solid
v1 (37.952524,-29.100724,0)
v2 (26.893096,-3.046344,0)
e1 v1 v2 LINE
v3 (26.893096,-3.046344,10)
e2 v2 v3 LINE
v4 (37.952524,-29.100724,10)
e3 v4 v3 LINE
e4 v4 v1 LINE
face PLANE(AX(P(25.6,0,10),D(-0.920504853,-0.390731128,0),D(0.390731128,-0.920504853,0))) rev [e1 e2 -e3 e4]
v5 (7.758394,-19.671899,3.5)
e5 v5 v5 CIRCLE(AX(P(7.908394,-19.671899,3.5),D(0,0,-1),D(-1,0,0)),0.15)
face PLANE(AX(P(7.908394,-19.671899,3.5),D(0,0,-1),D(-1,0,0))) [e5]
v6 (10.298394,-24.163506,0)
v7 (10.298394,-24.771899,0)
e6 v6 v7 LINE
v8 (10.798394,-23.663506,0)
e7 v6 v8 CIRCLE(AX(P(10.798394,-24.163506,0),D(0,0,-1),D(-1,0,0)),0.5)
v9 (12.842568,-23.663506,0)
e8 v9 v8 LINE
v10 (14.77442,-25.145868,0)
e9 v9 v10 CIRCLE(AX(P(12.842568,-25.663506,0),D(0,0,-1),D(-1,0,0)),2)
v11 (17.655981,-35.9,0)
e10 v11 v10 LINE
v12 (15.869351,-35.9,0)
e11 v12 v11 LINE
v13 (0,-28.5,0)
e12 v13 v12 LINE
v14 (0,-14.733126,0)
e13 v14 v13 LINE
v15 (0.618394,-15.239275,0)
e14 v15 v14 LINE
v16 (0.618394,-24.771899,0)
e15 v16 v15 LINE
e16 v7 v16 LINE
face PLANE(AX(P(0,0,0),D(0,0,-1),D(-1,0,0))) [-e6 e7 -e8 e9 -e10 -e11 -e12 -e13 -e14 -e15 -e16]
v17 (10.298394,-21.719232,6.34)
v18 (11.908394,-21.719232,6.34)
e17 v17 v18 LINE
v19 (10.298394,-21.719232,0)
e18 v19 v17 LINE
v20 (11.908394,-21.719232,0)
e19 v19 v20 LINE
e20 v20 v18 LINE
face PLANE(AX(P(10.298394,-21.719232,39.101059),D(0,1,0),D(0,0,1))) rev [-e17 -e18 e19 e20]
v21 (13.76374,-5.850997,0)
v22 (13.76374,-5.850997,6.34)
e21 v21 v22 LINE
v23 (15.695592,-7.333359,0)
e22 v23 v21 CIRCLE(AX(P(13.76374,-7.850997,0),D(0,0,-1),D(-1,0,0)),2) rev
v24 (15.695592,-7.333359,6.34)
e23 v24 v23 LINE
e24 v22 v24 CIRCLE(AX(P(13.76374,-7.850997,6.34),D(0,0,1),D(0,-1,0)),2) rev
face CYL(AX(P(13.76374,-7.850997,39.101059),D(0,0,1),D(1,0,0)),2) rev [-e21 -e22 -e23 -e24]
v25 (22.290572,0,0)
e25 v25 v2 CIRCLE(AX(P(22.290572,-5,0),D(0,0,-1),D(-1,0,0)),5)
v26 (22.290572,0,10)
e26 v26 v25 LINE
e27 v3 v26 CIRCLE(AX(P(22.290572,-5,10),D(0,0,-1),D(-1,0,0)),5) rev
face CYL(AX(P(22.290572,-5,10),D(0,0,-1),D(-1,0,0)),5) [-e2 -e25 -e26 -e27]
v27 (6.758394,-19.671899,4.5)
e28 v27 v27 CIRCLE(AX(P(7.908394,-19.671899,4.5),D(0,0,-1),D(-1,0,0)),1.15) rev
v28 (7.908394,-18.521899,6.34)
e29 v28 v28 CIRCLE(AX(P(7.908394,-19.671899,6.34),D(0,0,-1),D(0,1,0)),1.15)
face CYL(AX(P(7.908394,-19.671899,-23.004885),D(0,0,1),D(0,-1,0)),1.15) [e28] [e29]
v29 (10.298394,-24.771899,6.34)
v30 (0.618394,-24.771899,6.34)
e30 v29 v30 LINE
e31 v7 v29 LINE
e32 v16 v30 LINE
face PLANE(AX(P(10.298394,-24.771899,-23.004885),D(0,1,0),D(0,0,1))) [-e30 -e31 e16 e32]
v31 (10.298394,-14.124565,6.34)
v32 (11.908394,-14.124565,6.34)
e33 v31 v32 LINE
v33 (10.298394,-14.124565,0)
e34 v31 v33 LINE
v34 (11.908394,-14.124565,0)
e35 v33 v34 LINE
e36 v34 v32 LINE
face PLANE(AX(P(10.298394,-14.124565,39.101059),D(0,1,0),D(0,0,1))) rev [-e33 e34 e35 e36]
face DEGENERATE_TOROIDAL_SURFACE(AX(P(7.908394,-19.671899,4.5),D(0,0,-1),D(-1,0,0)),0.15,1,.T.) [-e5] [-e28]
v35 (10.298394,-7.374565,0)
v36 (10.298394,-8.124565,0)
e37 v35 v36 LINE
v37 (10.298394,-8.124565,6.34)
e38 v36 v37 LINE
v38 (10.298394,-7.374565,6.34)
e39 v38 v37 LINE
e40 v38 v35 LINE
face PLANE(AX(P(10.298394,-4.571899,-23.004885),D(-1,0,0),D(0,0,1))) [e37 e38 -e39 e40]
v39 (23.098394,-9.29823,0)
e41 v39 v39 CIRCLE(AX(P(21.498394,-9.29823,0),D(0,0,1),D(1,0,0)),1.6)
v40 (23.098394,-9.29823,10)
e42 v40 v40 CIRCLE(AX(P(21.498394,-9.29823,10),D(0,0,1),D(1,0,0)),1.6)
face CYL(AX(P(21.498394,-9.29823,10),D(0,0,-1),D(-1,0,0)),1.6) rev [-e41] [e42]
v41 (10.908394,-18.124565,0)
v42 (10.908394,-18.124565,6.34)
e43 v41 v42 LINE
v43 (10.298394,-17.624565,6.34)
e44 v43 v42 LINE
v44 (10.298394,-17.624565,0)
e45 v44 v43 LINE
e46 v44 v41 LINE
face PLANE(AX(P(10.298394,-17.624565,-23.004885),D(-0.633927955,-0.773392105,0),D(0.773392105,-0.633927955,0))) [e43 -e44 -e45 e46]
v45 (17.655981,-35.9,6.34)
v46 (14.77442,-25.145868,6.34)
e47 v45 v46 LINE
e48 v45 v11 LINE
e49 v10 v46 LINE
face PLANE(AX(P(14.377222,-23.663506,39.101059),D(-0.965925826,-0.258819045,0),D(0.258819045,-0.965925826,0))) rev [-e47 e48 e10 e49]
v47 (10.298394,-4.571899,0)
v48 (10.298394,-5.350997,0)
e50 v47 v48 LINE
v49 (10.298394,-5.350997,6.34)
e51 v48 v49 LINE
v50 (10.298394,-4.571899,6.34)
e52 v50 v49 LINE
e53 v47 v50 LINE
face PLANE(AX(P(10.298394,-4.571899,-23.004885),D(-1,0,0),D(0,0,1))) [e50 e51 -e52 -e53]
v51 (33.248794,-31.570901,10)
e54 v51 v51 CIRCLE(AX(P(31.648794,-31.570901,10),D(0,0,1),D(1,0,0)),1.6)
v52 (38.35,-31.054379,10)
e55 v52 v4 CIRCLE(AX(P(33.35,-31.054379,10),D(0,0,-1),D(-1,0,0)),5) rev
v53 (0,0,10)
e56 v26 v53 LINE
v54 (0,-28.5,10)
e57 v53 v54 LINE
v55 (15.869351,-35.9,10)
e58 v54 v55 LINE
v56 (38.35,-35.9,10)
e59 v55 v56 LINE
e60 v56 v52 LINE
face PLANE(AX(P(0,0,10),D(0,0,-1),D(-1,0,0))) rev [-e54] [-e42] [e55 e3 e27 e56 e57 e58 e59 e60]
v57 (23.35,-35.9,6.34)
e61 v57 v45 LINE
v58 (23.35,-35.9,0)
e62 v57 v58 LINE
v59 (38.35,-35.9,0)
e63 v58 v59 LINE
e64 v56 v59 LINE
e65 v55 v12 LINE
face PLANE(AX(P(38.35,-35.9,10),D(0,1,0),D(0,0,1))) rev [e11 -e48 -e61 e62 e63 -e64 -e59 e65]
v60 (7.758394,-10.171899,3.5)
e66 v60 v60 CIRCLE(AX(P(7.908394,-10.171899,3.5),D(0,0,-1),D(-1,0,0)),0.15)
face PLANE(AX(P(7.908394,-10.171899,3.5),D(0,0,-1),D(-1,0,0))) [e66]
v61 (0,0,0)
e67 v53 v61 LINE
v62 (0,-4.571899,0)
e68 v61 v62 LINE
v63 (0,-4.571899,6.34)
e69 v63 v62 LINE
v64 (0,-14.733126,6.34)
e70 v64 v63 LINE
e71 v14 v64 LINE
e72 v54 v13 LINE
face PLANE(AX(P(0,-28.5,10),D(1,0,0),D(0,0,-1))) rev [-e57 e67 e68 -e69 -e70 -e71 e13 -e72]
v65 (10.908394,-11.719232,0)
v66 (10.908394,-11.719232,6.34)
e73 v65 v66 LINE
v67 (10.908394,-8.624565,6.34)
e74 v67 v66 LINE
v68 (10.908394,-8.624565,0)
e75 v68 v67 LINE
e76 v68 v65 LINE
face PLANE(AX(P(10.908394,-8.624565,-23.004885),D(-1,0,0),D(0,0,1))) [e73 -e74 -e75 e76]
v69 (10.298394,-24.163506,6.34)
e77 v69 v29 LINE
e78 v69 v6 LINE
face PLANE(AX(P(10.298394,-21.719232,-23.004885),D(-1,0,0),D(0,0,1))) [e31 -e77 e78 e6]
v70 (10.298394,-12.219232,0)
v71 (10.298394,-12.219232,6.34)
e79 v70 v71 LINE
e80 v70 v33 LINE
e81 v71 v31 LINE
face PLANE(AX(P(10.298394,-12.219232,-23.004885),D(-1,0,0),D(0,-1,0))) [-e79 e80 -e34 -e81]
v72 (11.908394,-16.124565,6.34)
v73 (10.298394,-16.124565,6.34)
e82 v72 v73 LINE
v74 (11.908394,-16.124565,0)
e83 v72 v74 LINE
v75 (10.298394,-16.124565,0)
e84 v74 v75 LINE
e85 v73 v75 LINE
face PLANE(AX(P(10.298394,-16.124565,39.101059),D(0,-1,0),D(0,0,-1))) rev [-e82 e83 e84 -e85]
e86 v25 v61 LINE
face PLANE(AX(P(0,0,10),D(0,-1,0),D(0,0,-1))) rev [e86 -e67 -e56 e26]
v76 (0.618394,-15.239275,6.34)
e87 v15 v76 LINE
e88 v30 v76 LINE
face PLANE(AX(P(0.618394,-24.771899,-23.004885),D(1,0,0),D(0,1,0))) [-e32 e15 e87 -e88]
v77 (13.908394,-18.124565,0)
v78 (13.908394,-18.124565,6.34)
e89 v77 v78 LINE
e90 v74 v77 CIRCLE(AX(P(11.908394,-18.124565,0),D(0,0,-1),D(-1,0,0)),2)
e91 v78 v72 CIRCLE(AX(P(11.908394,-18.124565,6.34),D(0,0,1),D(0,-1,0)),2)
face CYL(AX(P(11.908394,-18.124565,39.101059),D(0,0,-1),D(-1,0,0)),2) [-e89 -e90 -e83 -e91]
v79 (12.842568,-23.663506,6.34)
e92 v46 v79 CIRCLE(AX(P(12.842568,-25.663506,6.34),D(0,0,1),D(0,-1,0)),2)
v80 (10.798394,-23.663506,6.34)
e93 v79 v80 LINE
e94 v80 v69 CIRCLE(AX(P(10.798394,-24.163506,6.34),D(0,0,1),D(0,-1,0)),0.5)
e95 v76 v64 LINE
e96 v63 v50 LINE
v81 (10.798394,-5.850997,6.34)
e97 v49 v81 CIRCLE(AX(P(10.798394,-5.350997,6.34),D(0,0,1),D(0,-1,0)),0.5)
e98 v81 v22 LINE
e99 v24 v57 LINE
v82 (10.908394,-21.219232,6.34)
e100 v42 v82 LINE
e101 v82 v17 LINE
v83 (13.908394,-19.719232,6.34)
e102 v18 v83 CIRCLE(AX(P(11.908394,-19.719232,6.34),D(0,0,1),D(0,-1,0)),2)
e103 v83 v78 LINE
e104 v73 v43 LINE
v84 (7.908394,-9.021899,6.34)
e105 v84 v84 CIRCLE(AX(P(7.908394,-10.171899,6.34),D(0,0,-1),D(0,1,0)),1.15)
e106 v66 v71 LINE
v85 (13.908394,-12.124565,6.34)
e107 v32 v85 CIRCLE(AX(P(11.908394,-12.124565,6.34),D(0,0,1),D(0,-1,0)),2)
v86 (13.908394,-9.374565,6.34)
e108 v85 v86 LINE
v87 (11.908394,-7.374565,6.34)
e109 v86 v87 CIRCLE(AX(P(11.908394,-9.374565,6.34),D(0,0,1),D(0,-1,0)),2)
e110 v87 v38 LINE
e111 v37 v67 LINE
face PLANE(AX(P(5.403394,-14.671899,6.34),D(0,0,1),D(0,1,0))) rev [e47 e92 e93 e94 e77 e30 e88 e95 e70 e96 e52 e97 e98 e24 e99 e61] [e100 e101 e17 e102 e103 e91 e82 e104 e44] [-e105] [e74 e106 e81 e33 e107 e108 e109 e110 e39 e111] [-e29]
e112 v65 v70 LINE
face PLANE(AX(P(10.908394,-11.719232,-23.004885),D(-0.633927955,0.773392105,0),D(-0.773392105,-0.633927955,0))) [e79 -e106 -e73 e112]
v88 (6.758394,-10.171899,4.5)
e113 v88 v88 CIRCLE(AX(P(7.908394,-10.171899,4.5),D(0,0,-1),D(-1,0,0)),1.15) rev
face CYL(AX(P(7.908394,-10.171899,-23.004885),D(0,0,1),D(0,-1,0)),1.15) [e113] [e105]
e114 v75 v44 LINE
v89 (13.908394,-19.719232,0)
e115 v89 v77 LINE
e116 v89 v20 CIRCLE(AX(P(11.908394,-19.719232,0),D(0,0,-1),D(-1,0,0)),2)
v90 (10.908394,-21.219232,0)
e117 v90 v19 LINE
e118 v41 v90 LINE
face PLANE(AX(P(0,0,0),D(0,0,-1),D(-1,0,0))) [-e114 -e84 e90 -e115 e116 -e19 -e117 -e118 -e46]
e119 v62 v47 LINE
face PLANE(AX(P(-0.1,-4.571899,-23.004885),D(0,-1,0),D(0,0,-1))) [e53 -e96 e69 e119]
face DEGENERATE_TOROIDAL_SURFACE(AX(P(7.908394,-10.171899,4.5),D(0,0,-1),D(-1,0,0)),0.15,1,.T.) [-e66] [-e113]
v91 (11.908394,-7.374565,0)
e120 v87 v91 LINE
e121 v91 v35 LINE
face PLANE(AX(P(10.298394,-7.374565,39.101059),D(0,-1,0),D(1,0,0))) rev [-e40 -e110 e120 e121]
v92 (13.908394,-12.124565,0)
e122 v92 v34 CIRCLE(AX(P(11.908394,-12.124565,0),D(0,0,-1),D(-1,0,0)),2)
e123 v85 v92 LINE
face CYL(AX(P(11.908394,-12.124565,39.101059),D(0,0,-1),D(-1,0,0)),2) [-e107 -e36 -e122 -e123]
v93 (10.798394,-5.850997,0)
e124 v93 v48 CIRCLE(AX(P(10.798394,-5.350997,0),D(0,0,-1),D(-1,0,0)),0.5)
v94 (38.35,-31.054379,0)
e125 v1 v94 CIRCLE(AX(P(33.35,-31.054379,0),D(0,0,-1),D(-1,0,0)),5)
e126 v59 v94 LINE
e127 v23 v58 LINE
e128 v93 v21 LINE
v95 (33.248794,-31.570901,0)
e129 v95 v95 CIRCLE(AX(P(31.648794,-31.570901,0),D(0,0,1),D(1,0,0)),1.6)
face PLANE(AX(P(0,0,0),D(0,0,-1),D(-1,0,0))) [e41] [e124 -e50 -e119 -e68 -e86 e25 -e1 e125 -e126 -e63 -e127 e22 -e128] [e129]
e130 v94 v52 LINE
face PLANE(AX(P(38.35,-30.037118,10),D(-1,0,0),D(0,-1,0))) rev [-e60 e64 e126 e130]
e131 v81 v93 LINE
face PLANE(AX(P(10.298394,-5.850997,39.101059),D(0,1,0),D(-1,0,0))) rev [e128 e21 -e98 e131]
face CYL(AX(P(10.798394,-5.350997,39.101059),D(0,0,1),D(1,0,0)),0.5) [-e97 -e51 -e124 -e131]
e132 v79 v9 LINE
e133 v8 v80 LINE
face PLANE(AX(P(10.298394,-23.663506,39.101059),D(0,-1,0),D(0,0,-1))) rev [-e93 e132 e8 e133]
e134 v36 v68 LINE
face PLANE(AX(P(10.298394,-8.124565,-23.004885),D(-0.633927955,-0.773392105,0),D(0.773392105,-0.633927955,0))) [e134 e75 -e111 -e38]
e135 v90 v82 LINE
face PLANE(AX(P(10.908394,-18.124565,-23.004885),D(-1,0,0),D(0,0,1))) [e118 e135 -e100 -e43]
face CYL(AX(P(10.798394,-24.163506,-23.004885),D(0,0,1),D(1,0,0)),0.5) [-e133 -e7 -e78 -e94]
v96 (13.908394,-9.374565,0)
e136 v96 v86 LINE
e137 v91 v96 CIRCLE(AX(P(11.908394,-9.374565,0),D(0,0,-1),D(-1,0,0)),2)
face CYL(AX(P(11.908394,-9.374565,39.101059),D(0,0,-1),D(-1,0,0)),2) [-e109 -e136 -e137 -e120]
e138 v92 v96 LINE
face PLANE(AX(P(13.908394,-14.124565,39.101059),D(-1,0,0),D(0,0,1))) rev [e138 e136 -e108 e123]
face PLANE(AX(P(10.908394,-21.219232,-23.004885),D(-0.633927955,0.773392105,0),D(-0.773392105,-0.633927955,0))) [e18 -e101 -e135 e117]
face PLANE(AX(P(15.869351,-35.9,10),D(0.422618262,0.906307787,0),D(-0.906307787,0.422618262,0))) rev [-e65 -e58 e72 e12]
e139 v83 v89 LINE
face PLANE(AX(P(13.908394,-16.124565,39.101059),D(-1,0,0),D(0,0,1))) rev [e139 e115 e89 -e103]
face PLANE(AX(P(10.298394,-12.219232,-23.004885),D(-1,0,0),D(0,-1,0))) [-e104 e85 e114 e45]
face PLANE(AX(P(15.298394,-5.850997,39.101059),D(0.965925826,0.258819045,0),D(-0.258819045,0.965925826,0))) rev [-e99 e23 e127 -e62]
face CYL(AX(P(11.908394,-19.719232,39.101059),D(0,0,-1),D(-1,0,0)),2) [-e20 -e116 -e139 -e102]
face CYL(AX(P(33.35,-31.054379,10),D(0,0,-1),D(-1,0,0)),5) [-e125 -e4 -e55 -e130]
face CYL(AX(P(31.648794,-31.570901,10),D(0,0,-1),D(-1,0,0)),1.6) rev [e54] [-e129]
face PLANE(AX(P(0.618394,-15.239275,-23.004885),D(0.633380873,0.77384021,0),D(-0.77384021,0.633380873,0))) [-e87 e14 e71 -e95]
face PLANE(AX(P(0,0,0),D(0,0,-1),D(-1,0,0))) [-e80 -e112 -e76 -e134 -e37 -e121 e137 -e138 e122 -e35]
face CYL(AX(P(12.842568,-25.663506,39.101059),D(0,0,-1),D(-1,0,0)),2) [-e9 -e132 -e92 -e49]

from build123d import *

# Parameters (mm, degrees)
SKETCH1_R           = 1.6
BOSS_EXTRUDE1_DEPTH = 10
CAVITY1_OUTLINE_R   = 1.25
CAVITY1_DEPTH       = 6.34
CAVITY1_START       = -22.606898648
CAVITY1_2_OUTLINE_R = 0.9
CAVITY1_2_DEPTH     = 0.47
CAVITY1_START_2     = -15.306898648
CAVITY1_3_OUTLINE_R = 0.9
CAVITY1_3_DEPTH     = 0.47
CAVITY1_START_3     = -6.506898648
CAVITY1_4_OUTLINE_R = 0.9
CAVITY1_4_DEPTH     = 0.47
CUT_EXTRUDE2_REACH  = 54.912
SKETCH2_R           = 1.15
CUT_EXTRUDE3_START  = -3.5
SKETCH3_R           = 1.15
CUT_EXTRUDE3_DEPTH  = 3.5
FILLET1_R           = 1
FILLET2_R           = 5
CUT_EXTRUDE4_START  = -6.34
CUT_EXTRUDE4_DEPTH  = 6.34
FILLET3_R           = 2
FILLET4_R           = 2
FILLET5_R           = 0.5


with BuildPart() as part:
    # Sketch1 → Boss-Extrude1 (new body)
    with BuildSketch(Plane.XY):
        Polygon((0, 0), (25.6, 0), (38.35, -30.037117664), (38.35, -35.9), (15.869351212, -35.9), (0, -28.5), align=None)
        with Locations((31.648794461, -31.570900751)):
            Circle(SKETCH1_R, mode=Mode.SUBTRACT)
        with Locations((21.498394042, -9.298229799)):
            Circle(SKETCH1_R, mode=Mode.SUBTRACT)
    extrude(amount=BOSS_EXTRUDE1_DEPTH)

    # Cavity1: read off the stored shape, not the designer's step
    # Cavity1 outline → Cavity1 (cut)
    with BuildSketch(Plane.XY):
        Polygon((10.198394042, -24.671898648), (10.198394042, -21.671898648), (10.808394042, -21.171898648), (10.808394042, -18.171898648), (10.198394042, -17.671898648), (10.198394042, -12.171898648), (10.808394042, -11.671898648), (10.808394042, -8.671898648), (10.198394042, -8.171898648), (10.198394042, -4.671898648), (0, -4.671898648), (0, -14.603899938), (0.718394042, -15.191898648), (0.718394042, -24.671898648), align=None)
        with Locations((7.908394042, -19.671898648)):
            Circle(CAVITY1_OUTLINE_R, mode=Mode.SUBTRACT)
        with Locations((7.908394042, -10.171898648)):
            Circle(CAVITY1_OUTLINE_R, mode=Mode.SUBTRACT)
    extrude(amount=CAVITY1_DEPTH, mode=Mode.SUBTRACT)

    # Cavity1 2 outline → Cavity1 2 (cut)
    with BuildSketch(Plane(origin=(0, 0, 0), x_dir=(1, 0, 0), z_dir=(0, 1, 0)).offset(CAVITY1_START)):
        Polygon((13.478394042, -4.73), (14.198394042, -4.01), (14.198394042, -2.33), (13.478394042, -1.61), (10.198394042, -1.61), (10.198394042, -4.73), align=None)
        with Locations((12.398394042, -3.17)):
            Circle(CAVITY1_2_OUTLINE_R, mode=Mode.SUBTRACT)
    extrude(amount=CAVITY1_2_DEPTH, mode=Mode.SUBTRACT)

    # Cavity1 3 outline → Cavity1 3 (cut)
    with BuildSketch(Plane(origin=(0, 0, 0), x_dir=(1, 0, 0), z_dir=(0, 1, 0)).offset(CAVITY1_START_2)):
        Polygon((13.478394042, -4.73), (14.198394042, -4.01), (14.198394042, -2.33), (13.478394042, -1.61), (10.198394042, -1.61), (10.198394042, -4.73), align=None)
        with Locations((12.398394042, -3.17)):
            Circle(CAVITY1_3_OUTLINE_R, mode=Mode.SUBTRACT)
    extrude(amount=CAVITY1_3_DEPTH, mode=Mode.SUBTRACT)

    # Cavity1 4 outline → Cavity1 4 (cut)
    with BuildSketch(Plane(origin=(0, 0, 0), x_dir=(1, 0, 0), z_dir=(0, 1, 0)).offset(CAVITY1_START_3)):
        Polygon((13.478394042, -4.73), (14.198394042, -4.01), (14.198394042, -2.33), (13.478394042, -1.61), (10.198394042, -1.61), (10.198394042, -4.73), align=None)
        with Locations((12.398394042, -3.17)):
            Circle(CAVITY1_4_OUTLINE_R, mode=Mode.SUBTRACT)
    extrude(amount=CAVITY1_4_DEPTH, mode=Mode.SUBTRACT)

    # Cut-Extrude2: up to this face of the body (flat: up to its plane)
    cut_extrude2_end = Plane(part.part.faces().sort_by_distance((19.850612991, -19.341556746, 0))[0])
    # Sketch2 → Cut-Extrude2 (cut, up to the picked face)
    with BuildSketch(Plane(origin=(0, 0, 6.34), x_dir=(-1, 0, 0), z_dir=(0, 0, -1)), mode=Mode.PRIVATE) as cut_extrude2_sk1:
        Polygon((-10.908394042, -21.219231953), (-10.298394042, -21.719231953), (-10.298394042, -24.771898648), (-0.618394042, -24.771898648), (-0.618394042, -15.239275241), (0.1, -14.651276531), (0.1, -4.571898648), (-10.298394042, -4.571898648), (-10.298394042, -8.124565343), (-10.908394042, -8.624565343), (-10.908394042, -11.719231953), (-10.298394042, -12.219231953), (-10.298394042, -17.624565343), (-10.908394042, -18.124565343), align=None)
        with Locations((-7.908394042, -10.171898648)):
            Circle(SKETCH2_R, mode=Mode.SUBTRACT)
        with Locations((-7.908394042, -19.671898648)):
            Circle(SKETCH2_R, mode=Mode.SUBTRACT)
    cut_extrude2_tool1 = split(extrude(cut_extrude2_sk1.sketch, amount=CUT_EXTRUDE2_REACH, mode=Mode.PRIVATE), bisect_by=cut_extrude2_end, keep=Keep.BOTH, mode=Mode.PRIVATE)
    add(cut_extrude2_tool1.solids().sort_by(Axis((5.274649, -14.483088, 6.34), (0, 0, -1)))[0], mode=Mode.SUBTRACT)

    # Sketch3 → Cut-Extrude3 (cut)
    with BuildSketch(Plane(origin=(0, 0, 0), x_dir=(-1, 0, 0), z_dir=(0, 0, -1)).offset(CUT_EXTRUDE3_START)):
        with Locations((-7.908394042, -10.171898648)):
            Circle(SKETCH3_R)
        with Locations((-7.908394042, -19.671898648)):
            Circle(SKETCH3_R)
    extrude(amount=CUT_EXTRUDE3_DEPTH, mode=Mode.SUBTRACT)

    # Fillet1
    fillet1_edges = [part.edges().sort_by_distance(p)[0] for p in [
        (9.058394042, -10.171898648, 3.5),
        (9.058394042, -19.671898648, 3.5),
    ]]
    fillet(fillet1_edges, radius=FILLET1_R)

    # Fillet2
    fillet2_edges = [part.edges().sort_by_distance(p)[0] for p in [
        (25.6, 0, 5),
        (38.35, -30.037117664, 5),
    ]]
    fillet(fillet2_edges, radius=FILLET2_R)

    # Sketch4 → Cut-Extrude4 (cut)
    with BuildSketch(Plane(origin=(0, 0, 0), x_dir=(-1, 0, 0), z_dir=(0, 0, -1)).offset(CUT_EXTRUDE4_START)):
        Polygon((-10.298394042, -5.850997484), (-15.298394042, -5.850997484), (-23.35, -35.9), (-17.655981008, -35.9), (-14.377222224, -23.663505632), (-10.298394042, -23.663505632), (-10.298394042, -21.719231953), (-13.908394042, -21.719231953), (-13.908394042, -16.124565343), (-10.298394042, -16.124565343), (-10.298394042, -14.124565343), (-13.908394042, -14.124565343), (-13.908394042, -7.374565343), (-10.298394042, -7.374565343), align=None)
    extrude(amount=CUT_EXTRUDE4_DEPTH, mode=Mode.SUBTRACT)

    # Fillet3
    fillet3_edges = [part.edges().sort_by_distance(p)[0] for p in [
        (14.377222224, -23.663505632, 3.17),
        (13.908394042, -21.719231953, 3.17),
        (13.908394042, -16.124565343, 3.17),
        (13.908394042, -14.124565343, 3.17),
        (13.908394042, -7.374565343, 3.17),
    ]]
    fillet(fillet3_edges, radius=FILLET3_R)

    # Fillet4
    fillet4_edges = [part.edges().sort_by_distance(p)[0] for p in [
        (15.298394042, -5.850997484, 3.17),
    ]]
    fillet(fillet4_edges, radius=FILLET4_R)

    # Fillet5
    fillet5_edges = [part.edges().sort_by_distance(p)[0] for p in [
        (10.298394042, -5.850997484, 3.17),
        (10.298394042, -23.663505632, 3.17),
    ]]
    fillet(fillet5_edges, radius=FILLET5_R)


solid = part.part
